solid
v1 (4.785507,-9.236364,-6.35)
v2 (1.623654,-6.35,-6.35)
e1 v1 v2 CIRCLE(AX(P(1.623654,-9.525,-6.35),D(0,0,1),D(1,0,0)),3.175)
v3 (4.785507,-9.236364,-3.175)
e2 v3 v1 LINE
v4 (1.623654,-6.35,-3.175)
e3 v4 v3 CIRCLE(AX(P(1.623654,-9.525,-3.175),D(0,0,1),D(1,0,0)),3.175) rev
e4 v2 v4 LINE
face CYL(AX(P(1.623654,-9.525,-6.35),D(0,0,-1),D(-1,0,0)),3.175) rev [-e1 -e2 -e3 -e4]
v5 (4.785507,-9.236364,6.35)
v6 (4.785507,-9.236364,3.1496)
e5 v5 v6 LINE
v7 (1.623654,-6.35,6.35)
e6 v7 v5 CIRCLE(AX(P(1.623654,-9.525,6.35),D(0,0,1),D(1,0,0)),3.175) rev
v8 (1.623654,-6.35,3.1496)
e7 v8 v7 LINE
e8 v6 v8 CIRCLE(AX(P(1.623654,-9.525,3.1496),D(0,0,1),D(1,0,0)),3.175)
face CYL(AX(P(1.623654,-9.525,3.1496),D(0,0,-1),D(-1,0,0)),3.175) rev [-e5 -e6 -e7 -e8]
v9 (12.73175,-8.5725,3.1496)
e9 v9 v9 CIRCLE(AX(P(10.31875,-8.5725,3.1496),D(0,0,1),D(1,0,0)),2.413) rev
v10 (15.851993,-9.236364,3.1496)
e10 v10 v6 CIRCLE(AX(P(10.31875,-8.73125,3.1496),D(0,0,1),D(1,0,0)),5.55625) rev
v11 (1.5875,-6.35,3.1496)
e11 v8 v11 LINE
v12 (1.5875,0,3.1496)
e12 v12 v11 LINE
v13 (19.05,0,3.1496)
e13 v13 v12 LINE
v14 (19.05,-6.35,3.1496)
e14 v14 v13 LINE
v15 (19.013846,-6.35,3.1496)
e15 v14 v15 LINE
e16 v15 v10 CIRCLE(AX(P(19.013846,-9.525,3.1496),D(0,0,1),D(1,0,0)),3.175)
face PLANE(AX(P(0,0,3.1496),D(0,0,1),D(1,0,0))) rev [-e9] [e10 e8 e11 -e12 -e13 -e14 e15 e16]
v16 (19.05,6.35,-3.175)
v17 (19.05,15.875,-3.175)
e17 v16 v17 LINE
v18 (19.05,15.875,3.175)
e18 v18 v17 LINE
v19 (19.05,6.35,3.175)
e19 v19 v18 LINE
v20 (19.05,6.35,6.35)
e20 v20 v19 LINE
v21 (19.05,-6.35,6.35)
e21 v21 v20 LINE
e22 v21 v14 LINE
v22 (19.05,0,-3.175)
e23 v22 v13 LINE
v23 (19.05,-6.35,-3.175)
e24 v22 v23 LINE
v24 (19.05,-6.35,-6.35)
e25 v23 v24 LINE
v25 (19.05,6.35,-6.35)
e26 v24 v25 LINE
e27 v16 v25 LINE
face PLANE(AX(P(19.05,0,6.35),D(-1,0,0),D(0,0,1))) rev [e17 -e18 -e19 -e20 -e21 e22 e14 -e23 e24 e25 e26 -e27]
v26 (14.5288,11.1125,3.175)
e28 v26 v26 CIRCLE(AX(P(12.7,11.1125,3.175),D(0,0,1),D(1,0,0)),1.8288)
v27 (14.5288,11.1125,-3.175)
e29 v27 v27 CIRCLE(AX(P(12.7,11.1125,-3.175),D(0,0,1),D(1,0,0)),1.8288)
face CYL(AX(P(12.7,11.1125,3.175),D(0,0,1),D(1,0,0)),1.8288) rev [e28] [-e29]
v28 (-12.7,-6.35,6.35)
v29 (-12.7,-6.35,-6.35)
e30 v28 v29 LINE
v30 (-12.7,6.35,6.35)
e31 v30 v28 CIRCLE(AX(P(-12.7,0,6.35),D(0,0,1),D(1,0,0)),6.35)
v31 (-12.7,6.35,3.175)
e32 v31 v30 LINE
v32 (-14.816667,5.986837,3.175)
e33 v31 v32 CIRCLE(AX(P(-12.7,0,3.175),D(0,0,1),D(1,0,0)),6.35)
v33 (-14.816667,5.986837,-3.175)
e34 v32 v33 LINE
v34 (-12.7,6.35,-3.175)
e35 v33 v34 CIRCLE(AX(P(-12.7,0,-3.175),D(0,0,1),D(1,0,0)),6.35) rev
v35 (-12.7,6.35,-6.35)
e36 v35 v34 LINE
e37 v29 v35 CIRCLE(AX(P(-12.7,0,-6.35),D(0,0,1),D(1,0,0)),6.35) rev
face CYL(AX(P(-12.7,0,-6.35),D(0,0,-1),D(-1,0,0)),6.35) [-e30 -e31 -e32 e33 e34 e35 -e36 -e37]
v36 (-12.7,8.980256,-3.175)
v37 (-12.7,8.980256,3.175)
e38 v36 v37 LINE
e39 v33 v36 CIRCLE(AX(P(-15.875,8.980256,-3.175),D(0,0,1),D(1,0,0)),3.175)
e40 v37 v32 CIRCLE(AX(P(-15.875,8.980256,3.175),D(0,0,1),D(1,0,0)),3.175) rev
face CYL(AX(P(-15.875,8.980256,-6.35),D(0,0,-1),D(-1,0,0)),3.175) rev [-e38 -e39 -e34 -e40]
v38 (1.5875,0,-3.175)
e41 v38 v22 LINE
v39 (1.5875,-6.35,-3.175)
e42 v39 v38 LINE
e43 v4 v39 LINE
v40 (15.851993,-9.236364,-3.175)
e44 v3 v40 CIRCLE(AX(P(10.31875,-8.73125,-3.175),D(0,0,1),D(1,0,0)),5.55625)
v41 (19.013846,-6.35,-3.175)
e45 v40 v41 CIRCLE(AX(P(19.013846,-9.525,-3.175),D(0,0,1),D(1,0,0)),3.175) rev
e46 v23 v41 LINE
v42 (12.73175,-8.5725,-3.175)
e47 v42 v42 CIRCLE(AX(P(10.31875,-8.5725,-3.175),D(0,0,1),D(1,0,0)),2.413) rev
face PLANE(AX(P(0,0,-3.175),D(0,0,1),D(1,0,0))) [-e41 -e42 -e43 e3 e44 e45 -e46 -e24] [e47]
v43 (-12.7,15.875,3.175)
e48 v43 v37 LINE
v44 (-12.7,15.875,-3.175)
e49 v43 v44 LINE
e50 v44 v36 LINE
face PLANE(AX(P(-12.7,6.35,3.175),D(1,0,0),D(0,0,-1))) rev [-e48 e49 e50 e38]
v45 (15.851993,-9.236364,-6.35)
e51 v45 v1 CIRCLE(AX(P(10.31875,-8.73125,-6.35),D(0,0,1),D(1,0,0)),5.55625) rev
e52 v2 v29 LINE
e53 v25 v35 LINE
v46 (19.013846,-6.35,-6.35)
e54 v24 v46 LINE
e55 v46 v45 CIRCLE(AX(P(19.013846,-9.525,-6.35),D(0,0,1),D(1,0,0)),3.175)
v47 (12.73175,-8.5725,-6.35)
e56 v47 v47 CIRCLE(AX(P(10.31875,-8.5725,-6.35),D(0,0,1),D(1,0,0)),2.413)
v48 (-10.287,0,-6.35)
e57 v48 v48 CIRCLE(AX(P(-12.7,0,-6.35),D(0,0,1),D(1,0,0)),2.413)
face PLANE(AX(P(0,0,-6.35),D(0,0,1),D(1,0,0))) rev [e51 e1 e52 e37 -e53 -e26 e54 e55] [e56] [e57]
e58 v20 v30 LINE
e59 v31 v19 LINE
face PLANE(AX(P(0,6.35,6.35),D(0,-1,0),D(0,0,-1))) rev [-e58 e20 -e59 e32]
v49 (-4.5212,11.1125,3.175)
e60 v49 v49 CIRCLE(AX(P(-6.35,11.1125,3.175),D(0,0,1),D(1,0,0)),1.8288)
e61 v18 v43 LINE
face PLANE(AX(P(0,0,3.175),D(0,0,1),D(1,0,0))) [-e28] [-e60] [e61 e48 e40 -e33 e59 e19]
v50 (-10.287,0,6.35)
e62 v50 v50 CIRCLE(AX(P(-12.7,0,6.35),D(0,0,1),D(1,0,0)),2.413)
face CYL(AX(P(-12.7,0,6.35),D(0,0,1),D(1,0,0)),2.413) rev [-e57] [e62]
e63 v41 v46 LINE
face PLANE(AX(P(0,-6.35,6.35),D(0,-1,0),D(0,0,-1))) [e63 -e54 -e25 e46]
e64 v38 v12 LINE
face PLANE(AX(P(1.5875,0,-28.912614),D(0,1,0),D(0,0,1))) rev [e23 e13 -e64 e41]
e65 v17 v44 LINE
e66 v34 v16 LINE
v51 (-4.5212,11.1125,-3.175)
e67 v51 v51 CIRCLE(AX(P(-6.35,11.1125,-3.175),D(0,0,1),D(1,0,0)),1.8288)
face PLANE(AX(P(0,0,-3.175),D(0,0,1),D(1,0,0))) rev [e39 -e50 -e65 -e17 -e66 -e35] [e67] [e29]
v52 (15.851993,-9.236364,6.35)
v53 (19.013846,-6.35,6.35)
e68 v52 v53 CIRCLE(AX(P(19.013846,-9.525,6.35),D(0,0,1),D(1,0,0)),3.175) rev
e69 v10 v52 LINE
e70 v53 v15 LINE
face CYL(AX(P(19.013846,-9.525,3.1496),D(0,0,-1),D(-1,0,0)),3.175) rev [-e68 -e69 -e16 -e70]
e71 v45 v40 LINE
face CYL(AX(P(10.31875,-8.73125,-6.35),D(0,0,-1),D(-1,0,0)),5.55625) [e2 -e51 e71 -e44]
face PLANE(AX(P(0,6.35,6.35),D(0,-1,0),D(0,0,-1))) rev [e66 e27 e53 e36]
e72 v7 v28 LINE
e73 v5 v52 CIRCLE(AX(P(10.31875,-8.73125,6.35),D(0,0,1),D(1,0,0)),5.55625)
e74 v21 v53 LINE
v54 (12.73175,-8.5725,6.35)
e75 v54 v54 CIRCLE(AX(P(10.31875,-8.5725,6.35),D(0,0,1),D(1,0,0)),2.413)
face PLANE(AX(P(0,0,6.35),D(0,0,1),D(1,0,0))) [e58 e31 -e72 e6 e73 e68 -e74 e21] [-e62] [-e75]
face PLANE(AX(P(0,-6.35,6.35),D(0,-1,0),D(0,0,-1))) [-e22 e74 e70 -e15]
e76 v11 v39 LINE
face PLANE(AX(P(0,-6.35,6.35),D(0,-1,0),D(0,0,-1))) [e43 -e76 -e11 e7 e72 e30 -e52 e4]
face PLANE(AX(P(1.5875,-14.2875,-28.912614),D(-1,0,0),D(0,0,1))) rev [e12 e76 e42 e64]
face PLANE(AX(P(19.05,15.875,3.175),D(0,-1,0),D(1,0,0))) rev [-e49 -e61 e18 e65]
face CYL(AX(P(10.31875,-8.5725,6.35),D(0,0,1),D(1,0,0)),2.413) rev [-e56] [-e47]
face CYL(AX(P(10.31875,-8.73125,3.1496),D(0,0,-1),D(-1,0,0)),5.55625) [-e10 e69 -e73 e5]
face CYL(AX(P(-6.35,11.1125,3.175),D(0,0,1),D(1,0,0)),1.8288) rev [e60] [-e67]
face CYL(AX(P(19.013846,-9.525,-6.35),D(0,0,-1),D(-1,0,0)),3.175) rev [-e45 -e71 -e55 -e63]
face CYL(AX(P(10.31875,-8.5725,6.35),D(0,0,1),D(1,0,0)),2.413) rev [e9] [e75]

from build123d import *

# Parameters (mm, degrees)
SKETCH1_W                             = 38.1
SKETCH1_H                             = 12.699999999999998
BOSS_EXTRUDE1_DEPTH                   = 6.35
BOSS_EXTRUDE2_DEPTH                   = 3.175
F_6_CLEARANCE_HOLE1_D                 = 3.6576
F_3_16_0_1875_CLEARANCE_DOWEL_HOLE1_D = 4.826
CUT_EXTRUDE3_DEPTH                    = 3.1496
CUT_EXTRUDE3_DEPTH_BACK               = 3.175
SKETCH8_W                             = 17.4625
SKETCH8_H                             = 14.287499999999998
FILLET2_RADIUS                        = 5.55625
FILLET2_LENGTH                        = 3.2004
FILLET3_RADIUS                        = 5.55625
FILLET3_LENGTH                        = 3.175
FILLET5_R                             = 3.175
FILLET7_R                             = 6.35
FILLET8_R                             = 3.175


# Some blends are built 0.0001 mm under size
with BuildPart() as part:
    # Sketch1 → Boss-Extrude1 (new, symmetric)
    with BuildSketch(Plane.XY):
        Polygon((15.875, -14.287499999999998), (15.875, -6.349999999999994), (4.762500000000001, -6.35), (4.762500000000001, -14.287499999999996), align=None)
        Rectangle(SKETCH1_W, SKETCH1_H)
    extrude(amount=BOSS_EXTRUDE1_DEPTH, both=True)

    # Sketch2 → Boss-Extrude2 (add, symmetric)
    with BuildSketch(Plane.XY):
        Polygon((19.05, 6.35), (-12.7, 6.349999999999996), (-12.7, 15.874999999999996), (19.05, 15.875), align=None)
    extrude(amount=BOSS_EXTRUDE2_DEPTH, both=True)

    # #6 Clearance Hole1 (through all)
    with Locations(Plane.XY.offset(3.175)):
        with Locations((-6.35, 11.1125), (12.7, 11.1125)):
            Hole(F_6_CLEARANCE_HOLE1_D / 2)

    # 3/16 (0.1875) Clearance Dowel Hole1 (through all)
    with Locations(Plane.XY.offset(6.35)):
        with Locations((-12.7, 0), (10.31875, -8.5725)):
            Hole(F_3_16_0_1875_CLEARANCE_DOWEL_HOLE1_D / 2)

    # Sketch8 → Cut-Extrude3 (cut, two sides: drawn at the far end of the back side and taken through both)
    with BuildSketch(Plane.XY.offset(-CUT_EXTRUDE3_DEPTH_BACK)):
        with Locations((10.318750000000001, -7.143749999999999)):
            Rectangle(SKETCH8_W, SKETCH8_H)
    extrude(amount=CUT_EXTRUDE3_DEPTH + CUT_EXTRUDE3_DEPTH_BACK, mode=Mode.SUBTRACT)

    # Fillet2: full round fillet: the end face becomes a half cylinder, R = half its width
    fillet2_face = Plane((10.31875, -14.2875, 4.7498), x_dir=(0, 0, 1), z_dir=(0, -1, 0))  # on the end face: x along it, z out of the body
    fillet2_slab = fillet2_face.offset(-FILLET2_RADIUS / 2) * Box(FILLET2_LENGTH, 2 * FILLET2_RADIUS, FILLET2_RADIUS, mode=Mode.PRIVATE)  # the body's end, R deep
    fillet2_round = Plane((10.31875, -8.73125, 4.7498), x_dir=(0, -1, 0), z_dir=(0, 0, 1)) * Cylinder(FILLET2_RADIUS, FILLET2_LENGTH, mode=Mode.PRIVATE)  # its axis R under the face
    add(fillet2_slab - fillet2_round, mode=Mode.SUBTRACT)

    # Fillet3: full round fillet: the end face becomes a half cylinder, R = half its width
    fillet3_face = Plane((10.31875, -14.2875, -4.7625), x_dir=(0, 0, 1), z_dir=(0, -1, 0))  # on the end face: x along it, z out of the body
    fillet3_slab = fillet3_face.offset(-FILLET3_RADIUS / 2) * Box(FILLET3_LENGTH, 2 * FILLET3_RADIUS, FILLET3_RADIUS, mode=Mode.PRIVATE)  # the body's end, R deep
    fillet3_round = Plane((10.31875, -8.73125, -4.7625), x_dir=(0, -1, 0), z_dir=(0, 0, 1)) * Cylinder(FILLET3_RADIUS, FILLET3_LENGTH, mode=Mode.PRIVATE)  # its axis R under the face
    add(fillet3_slab - fillet3_round, mode=Mode.SUBTRACT)

    # Fillet5
    fillet5_edges = [part.edges().sort_by_distance(p)[0] for p in [
        (15.875, -6.349999999999997, 4.7498),
        (15.875, -6.349999999999997, -4.762499999999999),
        (4.762500000000001, -6.349999999999998, -4.762499999999999),
        (4.762500000000001, -6.349999999999998, 4.7498),
    ]]
    fillet(fillet5_edges, radius=FILLET5_R - 0.0001)  # a hair under: the kernel refuses the full size

    # Fillet7
    fillet7_edges = [part.edges().sort_by_distance(p)[0] for p in [
        (-19.05, -6.35, 0),
        (-19.05, 6.35, 0),
    ]]
    fillet(fillet7_edges, radius=FILLET7_R - 0.0001)  # a hair under: the kernel refuses the full size

    # Fillet8
    # the kernel refuses this fillet: 3.175 mm, written as the material it adds along each edge
    with BuildSketch(Plane(origin=(-12.7, 6.349999999999996, 3.175), x_dir=(-0.9856005187452213, -0.16909055990548677, 0), z_dir=(0, 0, -1))) as fillet8_piece_1:
        with BuildLine():
            CenterArc((2.6845252143088953, 3.1292731923549355), FILLET8_R, 189.73494650787575, 70.5292047157078)
            Line((-0.4447564327071806, 2.5924106646550134), (-0.7576845974087891, 2.5387244118850214))
            Line((-0.7576845974087891, 2.5387244118850214), (-0.3129281647016085, -0.05368625276999218))
            Line((-0.3129281647016085, -0.05368625276999218), (0.05368625276999203, -0.31292816470160767))
            ThreePointArc((0.05368625276999203, -0.31292816470160767), (0.05378481282186907, -0.3129112556456122), (2.0939222275177753, -0.31292731923549344))
            Line((2.0939222275177753, -0.31292731923549344), (2.1476134081351503, -2e-17))
        make_face()
    extrude(amount=6.35)


solid = part.part
